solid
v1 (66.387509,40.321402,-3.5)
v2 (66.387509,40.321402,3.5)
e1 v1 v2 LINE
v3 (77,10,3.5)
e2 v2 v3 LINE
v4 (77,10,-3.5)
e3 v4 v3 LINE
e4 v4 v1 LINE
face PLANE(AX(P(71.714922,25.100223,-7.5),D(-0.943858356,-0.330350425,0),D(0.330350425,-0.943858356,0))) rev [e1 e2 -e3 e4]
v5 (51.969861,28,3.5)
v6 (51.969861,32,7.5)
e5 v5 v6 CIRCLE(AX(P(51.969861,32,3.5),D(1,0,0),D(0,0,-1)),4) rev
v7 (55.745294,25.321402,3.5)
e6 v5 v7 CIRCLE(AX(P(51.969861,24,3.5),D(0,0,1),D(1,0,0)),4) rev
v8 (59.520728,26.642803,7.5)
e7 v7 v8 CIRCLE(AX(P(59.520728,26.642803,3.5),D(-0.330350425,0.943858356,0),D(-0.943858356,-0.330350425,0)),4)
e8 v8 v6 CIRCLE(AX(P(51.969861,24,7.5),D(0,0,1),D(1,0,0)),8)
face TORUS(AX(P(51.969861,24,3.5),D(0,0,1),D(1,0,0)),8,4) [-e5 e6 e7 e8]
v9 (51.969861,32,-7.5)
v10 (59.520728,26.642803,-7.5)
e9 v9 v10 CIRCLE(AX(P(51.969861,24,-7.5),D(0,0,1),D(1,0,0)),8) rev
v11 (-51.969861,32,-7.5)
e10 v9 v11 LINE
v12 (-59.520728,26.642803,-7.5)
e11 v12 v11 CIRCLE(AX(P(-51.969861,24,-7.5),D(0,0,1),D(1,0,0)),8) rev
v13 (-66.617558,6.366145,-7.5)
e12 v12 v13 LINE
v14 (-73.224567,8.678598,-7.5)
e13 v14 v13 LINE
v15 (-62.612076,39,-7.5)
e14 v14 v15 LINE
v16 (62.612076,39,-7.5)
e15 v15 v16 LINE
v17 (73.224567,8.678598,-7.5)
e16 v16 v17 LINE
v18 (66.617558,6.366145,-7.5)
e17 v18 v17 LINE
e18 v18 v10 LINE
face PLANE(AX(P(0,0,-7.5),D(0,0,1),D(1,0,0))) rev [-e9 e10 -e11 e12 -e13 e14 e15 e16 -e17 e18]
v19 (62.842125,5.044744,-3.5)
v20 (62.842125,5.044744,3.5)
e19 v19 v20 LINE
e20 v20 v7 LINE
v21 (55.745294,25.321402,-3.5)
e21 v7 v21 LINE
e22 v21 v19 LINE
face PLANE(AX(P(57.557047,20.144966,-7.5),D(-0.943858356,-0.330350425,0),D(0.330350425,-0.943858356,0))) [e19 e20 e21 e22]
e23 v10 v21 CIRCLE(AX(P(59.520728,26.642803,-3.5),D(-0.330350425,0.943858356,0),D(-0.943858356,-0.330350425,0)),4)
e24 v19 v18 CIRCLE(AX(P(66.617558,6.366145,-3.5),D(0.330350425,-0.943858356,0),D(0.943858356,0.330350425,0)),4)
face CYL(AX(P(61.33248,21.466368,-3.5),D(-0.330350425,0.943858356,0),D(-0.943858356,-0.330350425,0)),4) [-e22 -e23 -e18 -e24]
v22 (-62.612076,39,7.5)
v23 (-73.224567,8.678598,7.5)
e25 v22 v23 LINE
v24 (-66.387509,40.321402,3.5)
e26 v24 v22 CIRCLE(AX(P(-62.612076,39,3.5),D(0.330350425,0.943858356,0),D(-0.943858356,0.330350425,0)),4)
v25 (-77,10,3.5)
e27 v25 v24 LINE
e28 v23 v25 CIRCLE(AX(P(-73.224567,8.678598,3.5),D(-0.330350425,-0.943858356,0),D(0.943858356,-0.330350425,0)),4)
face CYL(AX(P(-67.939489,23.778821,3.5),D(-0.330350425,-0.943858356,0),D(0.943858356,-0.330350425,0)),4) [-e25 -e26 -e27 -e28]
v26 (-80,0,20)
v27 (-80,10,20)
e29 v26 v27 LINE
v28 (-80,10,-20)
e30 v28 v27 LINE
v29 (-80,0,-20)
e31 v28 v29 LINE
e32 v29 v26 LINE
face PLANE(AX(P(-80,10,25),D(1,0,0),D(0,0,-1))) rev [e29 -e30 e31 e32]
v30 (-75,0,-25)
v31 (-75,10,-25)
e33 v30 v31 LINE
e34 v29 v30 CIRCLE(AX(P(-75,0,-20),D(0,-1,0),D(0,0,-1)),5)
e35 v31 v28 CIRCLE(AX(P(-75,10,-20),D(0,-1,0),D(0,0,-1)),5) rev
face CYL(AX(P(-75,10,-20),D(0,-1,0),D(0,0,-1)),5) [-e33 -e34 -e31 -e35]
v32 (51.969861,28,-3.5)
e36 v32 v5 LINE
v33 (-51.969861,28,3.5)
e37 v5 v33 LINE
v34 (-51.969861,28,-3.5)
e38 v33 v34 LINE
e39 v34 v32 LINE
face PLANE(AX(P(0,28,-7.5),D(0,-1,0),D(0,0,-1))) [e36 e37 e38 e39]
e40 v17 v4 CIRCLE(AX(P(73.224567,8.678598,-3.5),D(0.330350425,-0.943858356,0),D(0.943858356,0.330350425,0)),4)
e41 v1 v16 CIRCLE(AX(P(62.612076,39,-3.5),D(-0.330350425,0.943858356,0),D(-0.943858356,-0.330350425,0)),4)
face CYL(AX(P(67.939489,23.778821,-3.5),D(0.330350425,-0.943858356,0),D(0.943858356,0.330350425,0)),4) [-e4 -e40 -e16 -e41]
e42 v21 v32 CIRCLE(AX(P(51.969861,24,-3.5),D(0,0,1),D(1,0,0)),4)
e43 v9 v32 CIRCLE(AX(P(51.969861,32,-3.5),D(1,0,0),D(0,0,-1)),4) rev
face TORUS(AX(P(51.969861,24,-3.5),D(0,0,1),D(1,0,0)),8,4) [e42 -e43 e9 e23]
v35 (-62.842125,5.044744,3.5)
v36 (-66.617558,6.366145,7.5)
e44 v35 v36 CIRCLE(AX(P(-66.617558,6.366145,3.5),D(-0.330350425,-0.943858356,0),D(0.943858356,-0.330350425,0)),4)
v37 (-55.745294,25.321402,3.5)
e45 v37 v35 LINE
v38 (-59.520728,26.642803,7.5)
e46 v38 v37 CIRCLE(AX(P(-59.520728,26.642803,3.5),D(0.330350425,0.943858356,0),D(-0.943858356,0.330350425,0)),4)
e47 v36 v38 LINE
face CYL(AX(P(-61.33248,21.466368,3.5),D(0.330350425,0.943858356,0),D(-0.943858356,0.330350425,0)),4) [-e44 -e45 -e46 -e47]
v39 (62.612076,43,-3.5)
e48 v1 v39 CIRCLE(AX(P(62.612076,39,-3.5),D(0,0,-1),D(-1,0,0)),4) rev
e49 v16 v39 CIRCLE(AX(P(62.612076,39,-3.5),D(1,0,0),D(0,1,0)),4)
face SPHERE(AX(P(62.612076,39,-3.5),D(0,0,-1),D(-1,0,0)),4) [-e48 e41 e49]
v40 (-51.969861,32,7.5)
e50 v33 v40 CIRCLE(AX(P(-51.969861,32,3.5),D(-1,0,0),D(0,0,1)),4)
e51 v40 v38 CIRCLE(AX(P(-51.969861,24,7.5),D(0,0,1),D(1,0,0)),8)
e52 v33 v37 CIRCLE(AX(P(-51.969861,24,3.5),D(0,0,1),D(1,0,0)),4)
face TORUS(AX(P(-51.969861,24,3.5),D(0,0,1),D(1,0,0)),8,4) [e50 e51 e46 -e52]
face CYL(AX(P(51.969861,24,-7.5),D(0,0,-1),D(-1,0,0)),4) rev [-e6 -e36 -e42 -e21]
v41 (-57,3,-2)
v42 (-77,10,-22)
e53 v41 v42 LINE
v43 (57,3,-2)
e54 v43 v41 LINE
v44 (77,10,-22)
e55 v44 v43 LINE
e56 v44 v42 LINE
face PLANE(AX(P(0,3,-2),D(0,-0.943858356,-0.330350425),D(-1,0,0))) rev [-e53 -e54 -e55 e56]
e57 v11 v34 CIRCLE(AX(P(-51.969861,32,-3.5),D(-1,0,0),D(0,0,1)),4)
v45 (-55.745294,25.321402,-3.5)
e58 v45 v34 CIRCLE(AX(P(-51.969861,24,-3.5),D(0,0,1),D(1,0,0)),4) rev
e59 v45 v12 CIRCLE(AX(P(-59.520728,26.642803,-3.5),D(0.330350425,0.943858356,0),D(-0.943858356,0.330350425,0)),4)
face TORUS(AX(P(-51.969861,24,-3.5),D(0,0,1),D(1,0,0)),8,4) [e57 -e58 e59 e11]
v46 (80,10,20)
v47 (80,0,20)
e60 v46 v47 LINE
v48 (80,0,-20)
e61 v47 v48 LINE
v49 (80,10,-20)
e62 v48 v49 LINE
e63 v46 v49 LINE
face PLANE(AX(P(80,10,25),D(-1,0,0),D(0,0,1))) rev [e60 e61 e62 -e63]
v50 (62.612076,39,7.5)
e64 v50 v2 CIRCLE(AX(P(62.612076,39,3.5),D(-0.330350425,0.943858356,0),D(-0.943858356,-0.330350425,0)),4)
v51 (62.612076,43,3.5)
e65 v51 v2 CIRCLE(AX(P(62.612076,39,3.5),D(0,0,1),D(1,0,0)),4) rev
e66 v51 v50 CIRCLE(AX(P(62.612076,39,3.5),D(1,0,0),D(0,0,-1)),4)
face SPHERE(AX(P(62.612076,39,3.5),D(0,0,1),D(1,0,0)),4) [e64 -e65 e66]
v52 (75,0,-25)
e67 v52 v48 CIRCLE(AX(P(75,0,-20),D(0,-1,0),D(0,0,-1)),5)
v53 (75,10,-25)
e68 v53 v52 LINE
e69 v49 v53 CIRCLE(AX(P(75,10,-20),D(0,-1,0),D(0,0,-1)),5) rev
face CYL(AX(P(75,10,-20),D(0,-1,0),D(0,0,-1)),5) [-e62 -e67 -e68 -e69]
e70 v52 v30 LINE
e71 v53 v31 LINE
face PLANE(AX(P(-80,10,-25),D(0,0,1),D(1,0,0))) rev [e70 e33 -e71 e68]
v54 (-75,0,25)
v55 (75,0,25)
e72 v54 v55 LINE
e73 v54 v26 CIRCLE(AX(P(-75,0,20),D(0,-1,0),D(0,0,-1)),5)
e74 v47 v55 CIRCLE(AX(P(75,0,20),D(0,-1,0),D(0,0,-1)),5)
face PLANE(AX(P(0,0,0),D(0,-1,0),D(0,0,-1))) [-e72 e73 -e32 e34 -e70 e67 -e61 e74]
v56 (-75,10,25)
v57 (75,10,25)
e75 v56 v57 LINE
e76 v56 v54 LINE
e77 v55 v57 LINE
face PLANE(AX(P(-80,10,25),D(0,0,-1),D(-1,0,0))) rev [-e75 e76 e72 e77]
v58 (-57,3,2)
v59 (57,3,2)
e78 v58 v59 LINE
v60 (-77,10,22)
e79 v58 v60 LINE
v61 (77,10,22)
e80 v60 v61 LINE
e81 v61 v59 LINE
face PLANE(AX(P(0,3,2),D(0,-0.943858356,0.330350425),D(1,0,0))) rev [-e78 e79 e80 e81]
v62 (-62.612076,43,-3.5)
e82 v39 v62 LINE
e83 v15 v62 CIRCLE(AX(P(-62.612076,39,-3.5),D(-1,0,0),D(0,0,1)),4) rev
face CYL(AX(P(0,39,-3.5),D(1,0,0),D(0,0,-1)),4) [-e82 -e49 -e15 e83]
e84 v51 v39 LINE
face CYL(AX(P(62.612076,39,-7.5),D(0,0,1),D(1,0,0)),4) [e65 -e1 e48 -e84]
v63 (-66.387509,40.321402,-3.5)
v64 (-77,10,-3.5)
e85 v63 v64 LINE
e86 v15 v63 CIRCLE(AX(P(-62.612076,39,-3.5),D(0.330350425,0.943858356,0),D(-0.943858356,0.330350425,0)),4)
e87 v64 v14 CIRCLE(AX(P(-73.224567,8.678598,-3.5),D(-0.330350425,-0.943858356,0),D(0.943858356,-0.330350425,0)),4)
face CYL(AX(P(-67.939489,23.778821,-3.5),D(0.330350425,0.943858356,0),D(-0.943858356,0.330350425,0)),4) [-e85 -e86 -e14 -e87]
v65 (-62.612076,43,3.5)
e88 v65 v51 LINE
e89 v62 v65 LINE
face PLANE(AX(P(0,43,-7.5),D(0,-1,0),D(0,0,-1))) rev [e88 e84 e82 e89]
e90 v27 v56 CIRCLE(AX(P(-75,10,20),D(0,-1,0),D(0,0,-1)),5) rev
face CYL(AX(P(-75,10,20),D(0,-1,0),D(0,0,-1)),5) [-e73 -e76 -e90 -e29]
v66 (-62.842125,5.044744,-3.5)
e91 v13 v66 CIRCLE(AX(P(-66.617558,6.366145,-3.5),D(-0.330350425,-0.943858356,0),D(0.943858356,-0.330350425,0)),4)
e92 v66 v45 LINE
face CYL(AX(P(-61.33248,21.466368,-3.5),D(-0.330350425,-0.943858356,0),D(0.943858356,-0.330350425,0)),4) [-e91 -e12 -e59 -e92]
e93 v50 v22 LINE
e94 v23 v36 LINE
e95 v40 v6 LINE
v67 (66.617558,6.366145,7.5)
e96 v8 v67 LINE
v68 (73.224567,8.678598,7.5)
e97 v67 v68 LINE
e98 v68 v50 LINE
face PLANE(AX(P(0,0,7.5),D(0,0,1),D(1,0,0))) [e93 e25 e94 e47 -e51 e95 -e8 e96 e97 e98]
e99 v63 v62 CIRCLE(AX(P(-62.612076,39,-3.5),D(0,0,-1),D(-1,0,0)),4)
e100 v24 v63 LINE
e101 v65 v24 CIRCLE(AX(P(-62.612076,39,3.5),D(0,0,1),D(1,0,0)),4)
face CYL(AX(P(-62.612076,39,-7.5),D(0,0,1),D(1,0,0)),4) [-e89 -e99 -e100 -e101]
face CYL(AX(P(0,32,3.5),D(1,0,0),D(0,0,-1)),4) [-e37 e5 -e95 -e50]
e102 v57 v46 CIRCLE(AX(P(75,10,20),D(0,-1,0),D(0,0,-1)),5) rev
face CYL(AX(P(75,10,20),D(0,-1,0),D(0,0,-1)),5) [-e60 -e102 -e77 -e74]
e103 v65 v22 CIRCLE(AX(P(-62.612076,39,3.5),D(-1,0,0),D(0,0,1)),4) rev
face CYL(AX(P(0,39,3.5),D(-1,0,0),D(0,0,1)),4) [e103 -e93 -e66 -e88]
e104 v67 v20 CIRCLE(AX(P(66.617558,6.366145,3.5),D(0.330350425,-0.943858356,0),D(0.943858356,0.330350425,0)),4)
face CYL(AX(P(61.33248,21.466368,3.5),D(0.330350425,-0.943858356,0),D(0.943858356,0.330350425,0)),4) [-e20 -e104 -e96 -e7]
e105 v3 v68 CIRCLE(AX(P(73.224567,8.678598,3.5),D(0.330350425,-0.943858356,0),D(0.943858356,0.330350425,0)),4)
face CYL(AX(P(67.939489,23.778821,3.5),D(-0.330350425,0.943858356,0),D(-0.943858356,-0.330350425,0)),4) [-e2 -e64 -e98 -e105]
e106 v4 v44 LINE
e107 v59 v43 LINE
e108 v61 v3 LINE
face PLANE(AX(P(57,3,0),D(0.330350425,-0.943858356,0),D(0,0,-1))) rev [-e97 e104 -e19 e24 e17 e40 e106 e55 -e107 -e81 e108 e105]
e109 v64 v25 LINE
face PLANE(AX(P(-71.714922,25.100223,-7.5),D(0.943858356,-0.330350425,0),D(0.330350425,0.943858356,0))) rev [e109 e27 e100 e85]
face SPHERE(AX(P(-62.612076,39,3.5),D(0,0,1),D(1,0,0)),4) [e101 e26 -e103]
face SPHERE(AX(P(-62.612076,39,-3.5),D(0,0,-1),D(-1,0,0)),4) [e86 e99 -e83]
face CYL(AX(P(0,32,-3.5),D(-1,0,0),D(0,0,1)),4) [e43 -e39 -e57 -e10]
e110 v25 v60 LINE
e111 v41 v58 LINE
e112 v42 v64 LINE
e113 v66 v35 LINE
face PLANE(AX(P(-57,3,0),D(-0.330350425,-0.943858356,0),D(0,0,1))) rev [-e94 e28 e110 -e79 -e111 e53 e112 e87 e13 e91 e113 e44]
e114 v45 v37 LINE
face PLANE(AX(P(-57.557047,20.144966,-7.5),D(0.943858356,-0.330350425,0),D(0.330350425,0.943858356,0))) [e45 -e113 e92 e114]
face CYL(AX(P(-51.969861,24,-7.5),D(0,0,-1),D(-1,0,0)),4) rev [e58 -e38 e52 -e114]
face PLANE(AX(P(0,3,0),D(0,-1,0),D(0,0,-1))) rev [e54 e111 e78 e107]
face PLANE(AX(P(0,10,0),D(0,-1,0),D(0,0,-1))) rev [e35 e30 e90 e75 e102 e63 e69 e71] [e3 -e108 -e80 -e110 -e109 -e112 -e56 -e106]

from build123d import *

# Parameters (mm, degrees)
SKETCH1_W                = 160
SKETCH1_H                = 50
BOSS_EXTRUDE1_DEPTH      = 10
SHELL3_T                 = -3
FILLET1_R                = 5
CHAMFER1_SIZE            = 7
CHAMFER1_SIZE_2          = 20
BOSS_EXTRUDE2_DEPTH      = 7.5
BOSS_EXTRUDE2_DEPTH_BACK = 7.5
FILLET2_R                = 4


with BuildPart() as part:
    # Sketch1 → Boss-Extrude1 (new body)
    with BuildSketch(Plane(origin=(0, 0, 0), x_dir=(1, 0, 0), z_dir=(0, 1, 0))):
        Rectangle(SKETCH1_W, SKETCH1_H)
    extrude(amount=BOSS_EXTRUDE1_DEPTH)

    # Shell3
    shell3_openings = [part.faces().sort_by_distance(p)[0] for p in [
        (0, 10, 0),
    ]]
    offset(amount=SHELL3_T, openings=shell3_openings, kind=Kind.INTERSECTION)

    # Fillet1
    fillet1_edges = [part.edges().sort_by_distance(p)[0] for p in [
        (80, 5, 25),
        (-80, 5, 25),
        (-80, 5, -25),
        (80, 5, -25),
    ]]
    fillet(fillet1_edges, radius=FILLET1_R)

    # Chamfer1
    # the kernel refuses this chamfer: 20, 7 mm, written as the material it adds along each edge
    with BuildSketch(Plane(origin=(-77, 3, 22), x_dir=(0, 0.9946410899892074, 0.10338811394488961), z_dir=(1, 0, 0))) as chamfer1_piece_1_section:
        Polygon((CHAMFER1_SIZE * 0.994641089989, -CHAMFER1_SIZE * 0.103388113945), (-CHAMFER1_SIZE_2 * 0.103388113945, -CHAMFER1_SIZE_2 * 0.994641089989), (0, 0), align=None)
    chamfer1_piece_1 = extrude(amount=154, mode=Mode.PRIVATE)
    chamfer1_piece_1 = split(chamfer1_piece_1, bisect_by=Plane(origin=(0, 10, 15.125023974), z_dir=(0, -1, 0)), keep=Keep.TOP, mode=Mode.PRIVATE)
    add(chamfer1_piece_1)
    with BuildSketch(Plane(origin=(-77, 3, -22), x_dir=(-0.10338811394489059, 0.9946410899892072, 0), z_dir=(0, 0, 1))) as chamfer1_piece_2_section:
        Polygon((CHAMFER1_SIZE * 0.994641089989, -CHAMFER1_SIZE * 0.103388113945), (-CHAMFER1_SIZE_2 * 0.103388113945, -CHAMFER1_SIZE_2 * 0.994641089989), (0, 0), align=None)
    chamfer1_piece_2 = extrude(amount=44, mode=Mode.PRIVATE)
    chamfer1_piece_2 = split(chamfer1_piece_2, bisect_by=Plane(origin=(-70.125023974, 10, 0), z_dir=(0, -1, 0)), keep=Keep.TOP, mode=Mode.PRIVATE)
    add(chamfer1_piece_2)
    with BuildSketch(Plane(origin=(77, 3, -22), x_dir=(0, 0.9946410899892074, -0.10338811394488961), z_dir=(-1, 0, 0))) as chamfer1_piece_3_section:
        Polygon((CHAMFER1_SIZE * 0.994641089989, -CHAMFER1_SIZE * 0.103388113945), (-CHAMFER1_SIZE_2 * 0.103388113945, -CHAMFER1_SIZE_2 * 0.994641089989), (0, 0), align=None)
    chamfer1_piece_3 = extrude(amount=154, mode=Mode.PRIVATE)
    chamfer1_piece_3 = split(chamfer1_piece_3, bisect_by=Plane(origin=(0, 10, -15.125023974), z_dir=(0, -1, 0)), keep=Keep.TOP, mode=Mode.PRIVATE)
    add(chamfer1_piece_3)
    with BuildSketch(Plane(origin=(77, 3, 22), x_dir=(0.10338811394489059, 0.9946410899892072, 0), z_dir=(0, 0, -1))) as chamfer1_piece_4_section:
        Polygon((CHAMFER1_SIZE * 0.994641089989, -CHAMFER1_SIZE * 0.103388113945), (-CHAMFER1_SIZE_2 * 0.103388113945, -CHAMFER1_SIZE_2 * 0.994641089989), (0, 0), align=None)
    chamfer1_piece_4 = extrude(amount=44, mode=Mode.PRIVATE)
    chamfer1_piece_4 = split(chamfer1_piece_4, bisect_by=Plane(origin=(70.125023974, 10, 0), z_dir=(0, -1, 0)), keep=Keep.TOP, mode=Mode.PRIVATE)
    add(chamfer1_piece_4)

    # Sketch2 → Boss-Extrude2 (add, two sides: drawn at the far end of the back side and taken through both)
    with BuildSketch(Plane.XY.offset(-BOSS_EXTRUDE2_DEPTH_BACK)):
        Polygon((-65.45, 43), (-77, 10), (-62.842124655, 5.044743629), (-54.807784925, 28), (54.807784925, 28), (62.842124655, 5.044743629), (77, 10), (65.45, 43), align=None)
    extrude(amount=BOSS_EXTRUDE2_DEPTH + BOSS_EXTRUDE2_DEPTH_BACK)

    # Fillet2
    fillet2_edges = [part.edges().sort_by_distance(p)[0] for p in [
        (54.807784925, 28, 0),
        (0, 28, -7.5),
        (-54.807784925, 28, 0),
        (-58.82495479, 16.522371815, -7.5),
        (-71.225, 26.5, 7.5),
        (-65.45, 43, 0),
        (0, 43, 7.5),
        (65.45, 43, 0),
        (71.225, 26.5, 7.5),
        (58.82495479, 16.522371815, -7.5),
        (-71.225, 26.5, -7.5),
        (0, 43, -7.5),
        (71.225, 26.5, -7.5),
        (0, 28, 7.5),
        (58.82495479, 16.522371815, 7.5),
        (-58.82495479, 16.522371815, 7.5),
    ]]
    fillet(fillet2_edges, radius=FILLET2_R)


solid = part.part
